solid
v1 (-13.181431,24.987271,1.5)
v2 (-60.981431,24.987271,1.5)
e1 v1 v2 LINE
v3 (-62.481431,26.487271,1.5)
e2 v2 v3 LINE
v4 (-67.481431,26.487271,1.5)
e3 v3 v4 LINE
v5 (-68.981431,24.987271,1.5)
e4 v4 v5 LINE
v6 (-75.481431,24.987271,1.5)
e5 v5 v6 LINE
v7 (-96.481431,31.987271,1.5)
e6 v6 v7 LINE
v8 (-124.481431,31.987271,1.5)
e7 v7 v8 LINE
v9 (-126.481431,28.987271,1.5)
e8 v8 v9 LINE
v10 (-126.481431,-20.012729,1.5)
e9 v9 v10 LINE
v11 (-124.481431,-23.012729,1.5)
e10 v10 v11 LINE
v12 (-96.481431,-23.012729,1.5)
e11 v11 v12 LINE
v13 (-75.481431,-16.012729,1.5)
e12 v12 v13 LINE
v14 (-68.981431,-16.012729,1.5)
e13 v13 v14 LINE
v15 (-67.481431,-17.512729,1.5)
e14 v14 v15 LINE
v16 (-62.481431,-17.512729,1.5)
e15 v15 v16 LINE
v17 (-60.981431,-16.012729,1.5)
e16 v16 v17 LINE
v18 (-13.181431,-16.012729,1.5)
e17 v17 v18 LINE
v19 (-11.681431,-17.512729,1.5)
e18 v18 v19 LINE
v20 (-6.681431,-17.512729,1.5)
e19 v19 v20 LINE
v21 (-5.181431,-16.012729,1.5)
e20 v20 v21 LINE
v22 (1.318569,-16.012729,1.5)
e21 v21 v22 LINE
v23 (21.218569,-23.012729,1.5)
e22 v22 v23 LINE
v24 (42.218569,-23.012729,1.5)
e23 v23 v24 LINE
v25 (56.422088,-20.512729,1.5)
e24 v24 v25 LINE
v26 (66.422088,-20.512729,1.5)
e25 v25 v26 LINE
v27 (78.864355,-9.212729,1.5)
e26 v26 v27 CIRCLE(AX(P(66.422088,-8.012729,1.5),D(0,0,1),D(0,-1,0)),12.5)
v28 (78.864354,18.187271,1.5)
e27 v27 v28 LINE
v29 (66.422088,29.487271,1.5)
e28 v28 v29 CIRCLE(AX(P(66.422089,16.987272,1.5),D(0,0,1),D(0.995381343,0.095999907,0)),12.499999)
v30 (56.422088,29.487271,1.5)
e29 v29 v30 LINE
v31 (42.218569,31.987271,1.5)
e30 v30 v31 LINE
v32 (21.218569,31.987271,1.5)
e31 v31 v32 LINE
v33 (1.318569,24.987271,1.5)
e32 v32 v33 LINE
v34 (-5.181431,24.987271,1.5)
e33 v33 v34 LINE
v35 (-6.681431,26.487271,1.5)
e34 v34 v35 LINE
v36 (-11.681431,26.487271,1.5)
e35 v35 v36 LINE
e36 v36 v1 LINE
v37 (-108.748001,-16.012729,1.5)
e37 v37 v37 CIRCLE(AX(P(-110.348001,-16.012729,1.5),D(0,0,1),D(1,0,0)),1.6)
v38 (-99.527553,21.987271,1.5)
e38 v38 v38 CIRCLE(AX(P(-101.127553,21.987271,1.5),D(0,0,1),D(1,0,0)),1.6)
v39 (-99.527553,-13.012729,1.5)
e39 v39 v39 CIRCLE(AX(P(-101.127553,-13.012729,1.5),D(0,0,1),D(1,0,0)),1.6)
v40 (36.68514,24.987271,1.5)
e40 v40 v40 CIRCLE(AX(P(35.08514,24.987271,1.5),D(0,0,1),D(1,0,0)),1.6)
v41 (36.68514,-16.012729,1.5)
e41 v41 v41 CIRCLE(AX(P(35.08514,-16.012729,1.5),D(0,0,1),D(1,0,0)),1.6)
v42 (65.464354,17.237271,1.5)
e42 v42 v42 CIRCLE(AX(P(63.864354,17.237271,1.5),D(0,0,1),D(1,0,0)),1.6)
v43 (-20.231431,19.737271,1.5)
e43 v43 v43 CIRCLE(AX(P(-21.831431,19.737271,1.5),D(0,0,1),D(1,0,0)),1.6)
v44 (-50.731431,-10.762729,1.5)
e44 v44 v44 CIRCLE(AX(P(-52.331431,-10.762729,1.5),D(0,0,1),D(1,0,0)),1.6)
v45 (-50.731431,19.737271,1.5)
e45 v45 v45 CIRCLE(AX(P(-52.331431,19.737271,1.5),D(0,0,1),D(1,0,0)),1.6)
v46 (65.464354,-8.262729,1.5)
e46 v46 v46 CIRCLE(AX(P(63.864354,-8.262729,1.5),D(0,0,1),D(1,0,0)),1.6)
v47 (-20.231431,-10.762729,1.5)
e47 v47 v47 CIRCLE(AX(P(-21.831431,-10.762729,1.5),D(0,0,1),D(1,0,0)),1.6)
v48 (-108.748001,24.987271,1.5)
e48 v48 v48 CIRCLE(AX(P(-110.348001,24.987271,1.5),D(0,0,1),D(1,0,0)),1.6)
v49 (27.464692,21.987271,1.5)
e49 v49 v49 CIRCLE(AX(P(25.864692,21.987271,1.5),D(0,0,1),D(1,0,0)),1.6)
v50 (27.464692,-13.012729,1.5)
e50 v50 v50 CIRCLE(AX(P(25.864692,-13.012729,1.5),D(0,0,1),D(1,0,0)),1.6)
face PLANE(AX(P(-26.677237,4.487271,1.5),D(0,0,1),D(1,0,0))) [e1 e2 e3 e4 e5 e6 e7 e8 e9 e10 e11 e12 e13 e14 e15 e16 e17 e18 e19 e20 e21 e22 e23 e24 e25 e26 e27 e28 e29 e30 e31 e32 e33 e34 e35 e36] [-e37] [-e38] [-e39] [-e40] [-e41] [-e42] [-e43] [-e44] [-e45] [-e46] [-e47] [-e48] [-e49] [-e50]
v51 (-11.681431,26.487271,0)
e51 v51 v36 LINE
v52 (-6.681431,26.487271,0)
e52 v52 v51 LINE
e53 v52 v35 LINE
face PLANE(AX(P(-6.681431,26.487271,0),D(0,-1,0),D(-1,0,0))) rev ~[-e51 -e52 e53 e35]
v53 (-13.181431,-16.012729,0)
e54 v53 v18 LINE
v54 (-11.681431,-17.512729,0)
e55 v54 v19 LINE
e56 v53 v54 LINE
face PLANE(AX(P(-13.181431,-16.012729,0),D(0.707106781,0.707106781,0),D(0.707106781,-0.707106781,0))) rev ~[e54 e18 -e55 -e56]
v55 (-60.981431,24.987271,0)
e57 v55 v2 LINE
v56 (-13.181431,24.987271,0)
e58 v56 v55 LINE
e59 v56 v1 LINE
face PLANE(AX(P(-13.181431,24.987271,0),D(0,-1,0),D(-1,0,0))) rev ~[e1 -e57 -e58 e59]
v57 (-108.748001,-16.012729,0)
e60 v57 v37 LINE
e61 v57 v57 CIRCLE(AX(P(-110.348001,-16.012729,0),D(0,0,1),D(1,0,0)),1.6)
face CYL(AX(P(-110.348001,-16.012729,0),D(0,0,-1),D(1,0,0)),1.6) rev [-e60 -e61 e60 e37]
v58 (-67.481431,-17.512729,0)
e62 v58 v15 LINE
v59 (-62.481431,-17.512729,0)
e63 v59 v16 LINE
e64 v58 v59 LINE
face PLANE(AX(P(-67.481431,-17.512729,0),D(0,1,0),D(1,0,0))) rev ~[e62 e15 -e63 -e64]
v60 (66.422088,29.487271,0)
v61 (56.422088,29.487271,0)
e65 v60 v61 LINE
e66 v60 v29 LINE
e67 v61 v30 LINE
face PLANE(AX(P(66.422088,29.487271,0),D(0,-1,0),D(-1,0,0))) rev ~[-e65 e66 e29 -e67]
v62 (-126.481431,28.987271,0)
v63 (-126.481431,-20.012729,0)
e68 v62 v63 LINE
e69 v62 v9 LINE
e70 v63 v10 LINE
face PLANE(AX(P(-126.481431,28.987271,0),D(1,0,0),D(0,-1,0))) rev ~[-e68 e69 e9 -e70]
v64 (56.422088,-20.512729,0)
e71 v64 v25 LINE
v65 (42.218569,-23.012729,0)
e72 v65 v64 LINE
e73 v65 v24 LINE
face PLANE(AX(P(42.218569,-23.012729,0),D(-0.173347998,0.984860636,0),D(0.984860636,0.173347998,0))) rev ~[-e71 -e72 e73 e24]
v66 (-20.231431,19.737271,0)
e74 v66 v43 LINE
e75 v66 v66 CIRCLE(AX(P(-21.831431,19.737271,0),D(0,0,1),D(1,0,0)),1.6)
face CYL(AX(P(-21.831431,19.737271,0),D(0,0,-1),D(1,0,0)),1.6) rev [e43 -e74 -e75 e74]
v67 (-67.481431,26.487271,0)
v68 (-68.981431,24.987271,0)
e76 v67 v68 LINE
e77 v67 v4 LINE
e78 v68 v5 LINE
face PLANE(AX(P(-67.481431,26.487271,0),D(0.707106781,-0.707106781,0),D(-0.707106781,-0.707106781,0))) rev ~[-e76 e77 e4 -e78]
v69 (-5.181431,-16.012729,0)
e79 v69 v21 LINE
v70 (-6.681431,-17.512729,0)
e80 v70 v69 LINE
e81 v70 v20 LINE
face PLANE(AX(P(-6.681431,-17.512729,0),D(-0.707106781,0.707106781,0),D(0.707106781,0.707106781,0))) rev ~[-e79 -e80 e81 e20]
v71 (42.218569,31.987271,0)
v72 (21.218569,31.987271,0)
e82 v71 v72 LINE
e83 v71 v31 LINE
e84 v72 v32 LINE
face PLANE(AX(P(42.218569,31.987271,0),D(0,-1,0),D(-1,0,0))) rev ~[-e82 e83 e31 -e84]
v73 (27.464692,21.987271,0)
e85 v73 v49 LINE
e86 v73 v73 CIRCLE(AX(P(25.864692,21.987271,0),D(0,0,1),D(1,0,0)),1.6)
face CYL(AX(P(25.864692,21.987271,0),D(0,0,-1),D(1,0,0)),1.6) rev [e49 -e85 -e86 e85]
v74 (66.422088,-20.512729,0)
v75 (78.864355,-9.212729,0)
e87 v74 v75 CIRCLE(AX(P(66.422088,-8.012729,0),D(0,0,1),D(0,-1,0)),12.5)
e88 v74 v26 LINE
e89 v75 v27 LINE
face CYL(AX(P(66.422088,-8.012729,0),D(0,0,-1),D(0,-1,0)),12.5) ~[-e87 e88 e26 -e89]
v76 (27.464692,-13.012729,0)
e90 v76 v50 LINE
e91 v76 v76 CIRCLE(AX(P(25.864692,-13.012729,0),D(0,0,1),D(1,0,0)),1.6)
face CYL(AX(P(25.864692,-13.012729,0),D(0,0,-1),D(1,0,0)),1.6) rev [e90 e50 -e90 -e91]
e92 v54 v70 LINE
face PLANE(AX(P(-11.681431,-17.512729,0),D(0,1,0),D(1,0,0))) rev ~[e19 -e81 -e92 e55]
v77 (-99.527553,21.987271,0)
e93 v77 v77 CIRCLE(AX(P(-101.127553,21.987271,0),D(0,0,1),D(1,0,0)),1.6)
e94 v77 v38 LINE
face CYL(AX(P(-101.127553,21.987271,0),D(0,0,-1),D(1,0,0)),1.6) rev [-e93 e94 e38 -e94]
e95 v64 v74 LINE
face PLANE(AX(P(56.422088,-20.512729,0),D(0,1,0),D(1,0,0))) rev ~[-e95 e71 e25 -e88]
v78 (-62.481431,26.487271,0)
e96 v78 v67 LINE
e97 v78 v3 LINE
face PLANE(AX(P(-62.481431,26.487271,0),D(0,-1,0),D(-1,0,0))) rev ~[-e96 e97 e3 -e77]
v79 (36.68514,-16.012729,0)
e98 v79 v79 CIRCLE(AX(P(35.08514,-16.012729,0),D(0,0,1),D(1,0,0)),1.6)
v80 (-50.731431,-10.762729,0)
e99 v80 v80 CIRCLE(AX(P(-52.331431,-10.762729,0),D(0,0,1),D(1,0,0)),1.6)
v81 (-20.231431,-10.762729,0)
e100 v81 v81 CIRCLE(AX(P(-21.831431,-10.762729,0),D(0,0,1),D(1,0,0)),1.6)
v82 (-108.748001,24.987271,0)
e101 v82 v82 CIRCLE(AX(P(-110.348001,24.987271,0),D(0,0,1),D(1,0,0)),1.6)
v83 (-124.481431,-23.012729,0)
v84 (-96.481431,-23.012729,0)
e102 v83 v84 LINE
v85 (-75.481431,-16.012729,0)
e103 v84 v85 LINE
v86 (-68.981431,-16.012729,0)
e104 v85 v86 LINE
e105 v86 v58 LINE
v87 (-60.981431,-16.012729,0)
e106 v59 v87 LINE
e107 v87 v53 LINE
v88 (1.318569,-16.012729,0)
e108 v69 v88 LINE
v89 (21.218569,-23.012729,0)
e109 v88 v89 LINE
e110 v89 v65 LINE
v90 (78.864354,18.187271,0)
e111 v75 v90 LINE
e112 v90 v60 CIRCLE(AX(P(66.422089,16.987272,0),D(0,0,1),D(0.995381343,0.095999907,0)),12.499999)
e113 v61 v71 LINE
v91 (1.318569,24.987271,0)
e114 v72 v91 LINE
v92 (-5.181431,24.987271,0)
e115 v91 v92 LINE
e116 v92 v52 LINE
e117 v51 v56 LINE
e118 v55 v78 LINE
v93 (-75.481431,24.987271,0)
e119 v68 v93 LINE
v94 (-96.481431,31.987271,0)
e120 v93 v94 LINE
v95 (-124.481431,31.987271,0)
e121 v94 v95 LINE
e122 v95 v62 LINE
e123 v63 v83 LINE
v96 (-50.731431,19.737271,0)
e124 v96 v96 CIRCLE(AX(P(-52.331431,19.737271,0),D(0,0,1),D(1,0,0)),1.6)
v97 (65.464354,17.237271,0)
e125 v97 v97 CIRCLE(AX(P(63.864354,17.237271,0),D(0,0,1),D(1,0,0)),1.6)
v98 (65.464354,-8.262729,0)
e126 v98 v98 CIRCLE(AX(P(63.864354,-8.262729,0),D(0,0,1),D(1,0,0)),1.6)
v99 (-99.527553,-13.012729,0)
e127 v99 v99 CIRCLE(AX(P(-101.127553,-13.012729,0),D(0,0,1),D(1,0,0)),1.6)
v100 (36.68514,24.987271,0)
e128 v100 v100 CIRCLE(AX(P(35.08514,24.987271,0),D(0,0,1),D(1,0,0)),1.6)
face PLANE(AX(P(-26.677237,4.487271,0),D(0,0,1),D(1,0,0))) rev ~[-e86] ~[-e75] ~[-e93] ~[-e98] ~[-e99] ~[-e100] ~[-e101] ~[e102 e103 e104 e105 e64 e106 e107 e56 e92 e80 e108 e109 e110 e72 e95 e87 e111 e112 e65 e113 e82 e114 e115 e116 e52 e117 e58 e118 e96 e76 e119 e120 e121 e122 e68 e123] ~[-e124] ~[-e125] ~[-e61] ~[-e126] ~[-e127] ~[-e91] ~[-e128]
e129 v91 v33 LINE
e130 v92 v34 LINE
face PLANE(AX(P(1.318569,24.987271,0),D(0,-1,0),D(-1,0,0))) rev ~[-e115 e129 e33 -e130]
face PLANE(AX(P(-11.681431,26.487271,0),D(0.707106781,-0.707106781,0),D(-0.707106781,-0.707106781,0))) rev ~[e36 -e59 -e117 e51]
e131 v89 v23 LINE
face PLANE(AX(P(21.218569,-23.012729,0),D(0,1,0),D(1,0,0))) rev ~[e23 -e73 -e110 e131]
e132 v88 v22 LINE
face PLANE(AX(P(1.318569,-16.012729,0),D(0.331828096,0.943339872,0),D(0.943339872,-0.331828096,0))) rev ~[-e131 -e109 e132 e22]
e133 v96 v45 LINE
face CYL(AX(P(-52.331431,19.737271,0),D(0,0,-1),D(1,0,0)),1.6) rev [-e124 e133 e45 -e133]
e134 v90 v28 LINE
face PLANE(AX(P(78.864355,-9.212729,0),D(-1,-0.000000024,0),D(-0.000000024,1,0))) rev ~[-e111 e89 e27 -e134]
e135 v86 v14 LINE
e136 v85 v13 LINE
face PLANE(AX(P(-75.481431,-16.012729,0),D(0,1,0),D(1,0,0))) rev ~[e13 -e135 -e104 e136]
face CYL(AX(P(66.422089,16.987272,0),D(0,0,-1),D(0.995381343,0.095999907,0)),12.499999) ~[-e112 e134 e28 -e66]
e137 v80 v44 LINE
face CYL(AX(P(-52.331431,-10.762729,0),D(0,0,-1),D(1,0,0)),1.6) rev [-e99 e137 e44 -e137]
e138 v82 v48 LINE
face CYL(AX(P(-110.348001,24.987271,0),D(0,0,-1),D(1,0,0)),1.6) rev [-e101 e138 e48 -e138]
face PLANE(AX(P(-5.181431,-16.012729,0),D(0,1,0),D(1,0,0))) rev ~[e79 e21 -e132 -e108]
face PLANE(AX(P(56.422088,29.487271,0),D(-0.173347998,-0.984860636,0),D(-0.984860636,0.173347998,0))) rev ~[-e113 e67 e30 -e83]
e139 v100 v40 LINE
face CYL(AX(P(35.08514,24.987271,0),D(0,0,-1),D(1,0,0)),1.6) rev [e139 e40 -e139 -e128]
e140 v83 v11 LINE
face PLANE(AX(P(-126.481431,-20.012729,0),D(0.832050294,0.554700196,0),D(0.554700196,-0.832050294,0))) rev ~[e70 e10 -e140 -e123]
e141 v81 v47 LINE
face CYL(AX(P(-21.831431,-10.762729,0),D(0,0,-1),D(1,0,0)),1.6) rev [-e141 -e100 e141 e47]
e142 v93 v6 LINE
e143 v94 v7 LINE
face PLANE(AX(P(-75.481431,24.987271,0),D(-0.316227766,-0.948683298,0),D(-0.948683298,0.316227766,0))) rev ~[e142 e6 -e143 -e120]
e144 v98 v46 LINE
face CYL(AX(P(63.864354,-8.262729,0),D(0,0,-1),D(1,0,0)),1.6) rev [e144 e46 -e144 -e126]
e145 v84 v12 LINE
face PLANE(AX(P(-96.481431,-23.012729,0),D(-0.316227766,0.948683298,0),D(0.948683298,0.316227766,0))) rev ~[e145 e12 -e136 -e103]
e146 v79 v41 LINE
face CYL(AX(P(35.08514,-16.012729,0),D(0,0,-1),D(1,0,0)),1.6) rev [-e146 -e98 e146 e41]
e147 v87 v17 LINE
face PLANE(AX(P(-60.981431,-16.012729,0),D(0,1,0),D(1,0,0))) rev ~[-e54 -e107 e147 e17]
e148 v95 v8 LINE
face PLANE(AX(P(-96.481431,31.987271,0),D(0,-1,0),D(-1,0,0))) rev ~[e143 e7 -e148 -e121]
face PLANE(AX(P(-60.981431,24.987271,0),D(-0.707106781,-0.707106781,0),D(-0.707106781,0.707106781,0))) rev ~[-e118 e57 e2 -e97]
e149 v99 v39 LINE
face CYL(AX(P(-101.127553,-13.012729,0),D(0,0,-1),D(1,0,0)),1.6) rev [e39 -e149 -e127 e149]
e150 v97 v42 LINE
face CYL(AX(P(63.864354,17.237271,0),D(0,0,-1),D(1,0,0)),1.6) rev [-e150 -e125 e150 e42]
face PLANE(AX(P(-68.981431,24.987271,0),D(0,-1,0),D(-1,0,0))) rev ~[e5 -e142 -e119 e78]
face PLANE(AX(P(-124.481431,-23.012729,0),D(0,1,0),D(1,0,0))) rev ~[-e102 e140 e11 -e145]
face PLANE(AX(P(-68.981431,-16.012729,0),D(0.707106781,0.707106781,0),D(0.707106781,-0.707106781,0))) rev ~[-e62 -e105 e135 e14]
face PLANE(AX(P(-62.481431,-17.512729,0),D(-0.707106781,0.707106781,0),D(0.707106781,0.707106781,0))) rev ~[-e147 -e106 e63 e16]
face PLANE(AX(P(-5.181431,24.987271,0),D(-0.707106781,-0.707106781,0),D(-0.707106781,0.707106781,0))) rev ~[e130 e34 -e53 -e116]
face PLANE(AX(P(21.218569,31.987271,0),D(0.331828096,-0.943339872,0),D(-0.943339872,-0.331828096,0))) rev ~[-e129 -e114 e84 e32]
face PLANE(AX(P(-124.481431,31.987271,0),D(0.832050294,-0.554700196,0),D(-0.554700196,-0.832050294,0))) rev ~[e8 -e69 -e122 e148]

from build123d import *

# Parameters (mm, degrees)
F0_R     = 1.6
F1_DEPTH = 1.5


# Not quite as in the source:
# - ends of sketch curves that miss each other by under 0.0002 mm in the source are joined


with BuildPart() as f1:
    # F0 (on Top) → F1 (new body)
    with BuildSketch(Plane.XY):
        with BuildLine():
            Line((-9.1814305153, -17.5127292487), (-6.6814305153, -17.5127292487))
            Line((-6.6814305153, -17.5127292487), (-5.1814305153, -16.0127292487))
            Line((-5.1814305153, -16.0127292487), (1.3185694847, -16.0127292487))
            Line((1.3185694847, -16.0127292487), (21.2185694847, -23.0127292487))
            Line((21.2185694847, -23.0127292487), (42.2185694847, -23.0127292487))
            Line((42.2185694847, -23.0127292487), (56.4220884847, -20.5127292487))
            Line((56.4220884847, -20.5127292487), (66.4220884847, -20.5127292487))
            ThreePointArc((66.4220884847, -20.5127292487), (74.8259566177, -17.2661070322), (78.864355153, -9.2127293132))
            Line((78.864355153, -9.2127293132), (78.8643544847, 18.1872707513))
            ThreePointArc((78.8643544847, 18.1872707513), (74.8259566177, 26.2406485347), (66.4220884847, 29.4872707513))
            Line((66.4220884847, 29.4872707513), (56.4220884847, 29.4872707513))
            Line((56.4220884847, 29.4872707513), (42.2185694847, 31.9872707513))
            Line((42.2185694847, 31.9872707513), (21.2185694847, 31.9872707513))
            Line((21.2185694847, 31.9872707513), (1.3185694847, 24.9872707513))
            Line((1.3185694847, 24.9872707513), (-5.1814305153, 24.9872707513))
            Line((-5.1814305153, 24.9872707513), (-6.6814305153, 26.4872707513))
            Line((-6.6814305153, 26.4872707513), (-9.1814305153, 26.4872707513))
            Line((-9.1814305153, 26.4872707513), (-11.6814305153, 26.4872707513))
            Line((-11.6814305153, 26.4872707513), (-13.1814305153, 24.9872707513))
            Line((-13.1814305153, 24.9872707513), (-60.9814305153, 24.9872707513))
            Line((-60.9814305153, 24.9872707513), (-62.4814305153, 26.4872707513))
            Line((-62.4814305153, 26.4872707513), (-64.9814305153, 26.4872707513))
            Line((-64.9814305153, 26.4872707513), (-67.4814305153, 26.4872707513))
            Line((-67.4814305153, 26.4872707513), (-68.9814305153, 24.9872707513))
            Line((-68.9814305153, 24.9872707513), (-75.4814305153, 24.9872707513))
            Line((-75.4814305153, 24.9872707513), (-96.4814305153, 31.9872707513))
            Line((-96.4814305153, 31.9872707513), (-116.4814305153, 31.9872707513))
            Line((-116.4814305153, 31.9872707513), (-124.4814305153, 31.9872707513))
            Line((-124.4814305153, 31.9872707513), (-126.4814305153, 28.9872707513))
            Line((-126.4814305153, 28.9872707513), (-126.4814305153, -20.0127292487))
            Line((-126.4814305153, -20.0127292487), (-124.4814305153, -23.0127292487))
            Line((-124.4814305153, -23.0127292487), (-116.4814305153, -23.0127292487))
            Line((-116.4814305153, -23.0127292487), (-96.4814305153, -23.0127292487))
            Line((-96.4814305153, -23.0127292487), (-75.4814305153, -16.0127292487))
            Line((-75.4814305153, -16.0127292487), (-68.9814305153, -16.0127292487))
            Line((-68.9814305153, -16.0127292487), (-67.4814305153, -17.5127292487))
            Line((-67.4814305153, -17.5127292487), (-64.9814305153, -17.5127292487))
            Line((-64.9814305153, -17.5127292487), (-62.4814305153, -17.5127292487))
            Line((-62.4814305153, -17.5127292487), (-60.9814305153, -16.0127292487))
            Line((-60.9814305153, -16.0127292487), (-13.1814305153, -16.0127292487))
            Line((-13.1814305153, -16.0127292487), (-11.6814305153, -17.5127292487))
            Line((-11.6814305153, -17.5127292487), (-9.1814305153, -17.5127292487))
        make_face()
        with Locations((-110.3480007641, -16.0127292487)):
            Circle(F0_R, mode=Mode.SUBTRACT)
        with Locations((-101.1275529865, -13.0127292487)):
            Circle(F0_R, mode=Mode.SUBTRACT)
        with Locations((-52.3314305153, -10.7627292487)):
            Circle(F0_R, mode=Mode.SUBTRACT)
        with Locations((-21.8314305153, -10.7627292487)):
            Circle(F0_R, mode=Mode.SUBTRACT)
        with Locations((25.8646919559, -13.0127292487)):
            Circle(F0_R, mode=Mode.SUBTRACT)
        with Locations((35.0851397335, -16.0127292487)):
            Circle(F0_R, mode=Mode.SUBTRACT)
        with Locations((63.8643544847, -8.2627292487)):
            Circle(F0_R, mode=Mode.SUBTRACT)
        with Locations((-101.1275529865, 21.9872707513)):
            Circle(F0_R, mode=Mode.SUBTRACT)
        with Locations((-110.3480007641, 24.9872707513)):
            Circle(F0_R, mode=Mode.SUBTRACT)
        with Locations((-52.3314305153, 19.7372707513)):
            Circle(F0_R, mode=Mode.SUBTRACT)
        with Locations((63.8643544847, 17.2372707513)):
            Circle(F0_R, mode=Mode.SUBTRACT)
        with Locations((-21.8314305153, 19.7372707513)):
            Circle(F0_R, mode=Mode.SUBTRACT)
        with Locations((25.8646919559, 21.9872707513)):
            Circle(F0_R, mode=Mode.SUBTRACT)
        with Locations((35.0851397335, 24.9872707513)):
            Circle(F0_R, mode=Mode.SUBTRACT)
    extrude(amount=F1_DEPTH)


solid = f1.part
